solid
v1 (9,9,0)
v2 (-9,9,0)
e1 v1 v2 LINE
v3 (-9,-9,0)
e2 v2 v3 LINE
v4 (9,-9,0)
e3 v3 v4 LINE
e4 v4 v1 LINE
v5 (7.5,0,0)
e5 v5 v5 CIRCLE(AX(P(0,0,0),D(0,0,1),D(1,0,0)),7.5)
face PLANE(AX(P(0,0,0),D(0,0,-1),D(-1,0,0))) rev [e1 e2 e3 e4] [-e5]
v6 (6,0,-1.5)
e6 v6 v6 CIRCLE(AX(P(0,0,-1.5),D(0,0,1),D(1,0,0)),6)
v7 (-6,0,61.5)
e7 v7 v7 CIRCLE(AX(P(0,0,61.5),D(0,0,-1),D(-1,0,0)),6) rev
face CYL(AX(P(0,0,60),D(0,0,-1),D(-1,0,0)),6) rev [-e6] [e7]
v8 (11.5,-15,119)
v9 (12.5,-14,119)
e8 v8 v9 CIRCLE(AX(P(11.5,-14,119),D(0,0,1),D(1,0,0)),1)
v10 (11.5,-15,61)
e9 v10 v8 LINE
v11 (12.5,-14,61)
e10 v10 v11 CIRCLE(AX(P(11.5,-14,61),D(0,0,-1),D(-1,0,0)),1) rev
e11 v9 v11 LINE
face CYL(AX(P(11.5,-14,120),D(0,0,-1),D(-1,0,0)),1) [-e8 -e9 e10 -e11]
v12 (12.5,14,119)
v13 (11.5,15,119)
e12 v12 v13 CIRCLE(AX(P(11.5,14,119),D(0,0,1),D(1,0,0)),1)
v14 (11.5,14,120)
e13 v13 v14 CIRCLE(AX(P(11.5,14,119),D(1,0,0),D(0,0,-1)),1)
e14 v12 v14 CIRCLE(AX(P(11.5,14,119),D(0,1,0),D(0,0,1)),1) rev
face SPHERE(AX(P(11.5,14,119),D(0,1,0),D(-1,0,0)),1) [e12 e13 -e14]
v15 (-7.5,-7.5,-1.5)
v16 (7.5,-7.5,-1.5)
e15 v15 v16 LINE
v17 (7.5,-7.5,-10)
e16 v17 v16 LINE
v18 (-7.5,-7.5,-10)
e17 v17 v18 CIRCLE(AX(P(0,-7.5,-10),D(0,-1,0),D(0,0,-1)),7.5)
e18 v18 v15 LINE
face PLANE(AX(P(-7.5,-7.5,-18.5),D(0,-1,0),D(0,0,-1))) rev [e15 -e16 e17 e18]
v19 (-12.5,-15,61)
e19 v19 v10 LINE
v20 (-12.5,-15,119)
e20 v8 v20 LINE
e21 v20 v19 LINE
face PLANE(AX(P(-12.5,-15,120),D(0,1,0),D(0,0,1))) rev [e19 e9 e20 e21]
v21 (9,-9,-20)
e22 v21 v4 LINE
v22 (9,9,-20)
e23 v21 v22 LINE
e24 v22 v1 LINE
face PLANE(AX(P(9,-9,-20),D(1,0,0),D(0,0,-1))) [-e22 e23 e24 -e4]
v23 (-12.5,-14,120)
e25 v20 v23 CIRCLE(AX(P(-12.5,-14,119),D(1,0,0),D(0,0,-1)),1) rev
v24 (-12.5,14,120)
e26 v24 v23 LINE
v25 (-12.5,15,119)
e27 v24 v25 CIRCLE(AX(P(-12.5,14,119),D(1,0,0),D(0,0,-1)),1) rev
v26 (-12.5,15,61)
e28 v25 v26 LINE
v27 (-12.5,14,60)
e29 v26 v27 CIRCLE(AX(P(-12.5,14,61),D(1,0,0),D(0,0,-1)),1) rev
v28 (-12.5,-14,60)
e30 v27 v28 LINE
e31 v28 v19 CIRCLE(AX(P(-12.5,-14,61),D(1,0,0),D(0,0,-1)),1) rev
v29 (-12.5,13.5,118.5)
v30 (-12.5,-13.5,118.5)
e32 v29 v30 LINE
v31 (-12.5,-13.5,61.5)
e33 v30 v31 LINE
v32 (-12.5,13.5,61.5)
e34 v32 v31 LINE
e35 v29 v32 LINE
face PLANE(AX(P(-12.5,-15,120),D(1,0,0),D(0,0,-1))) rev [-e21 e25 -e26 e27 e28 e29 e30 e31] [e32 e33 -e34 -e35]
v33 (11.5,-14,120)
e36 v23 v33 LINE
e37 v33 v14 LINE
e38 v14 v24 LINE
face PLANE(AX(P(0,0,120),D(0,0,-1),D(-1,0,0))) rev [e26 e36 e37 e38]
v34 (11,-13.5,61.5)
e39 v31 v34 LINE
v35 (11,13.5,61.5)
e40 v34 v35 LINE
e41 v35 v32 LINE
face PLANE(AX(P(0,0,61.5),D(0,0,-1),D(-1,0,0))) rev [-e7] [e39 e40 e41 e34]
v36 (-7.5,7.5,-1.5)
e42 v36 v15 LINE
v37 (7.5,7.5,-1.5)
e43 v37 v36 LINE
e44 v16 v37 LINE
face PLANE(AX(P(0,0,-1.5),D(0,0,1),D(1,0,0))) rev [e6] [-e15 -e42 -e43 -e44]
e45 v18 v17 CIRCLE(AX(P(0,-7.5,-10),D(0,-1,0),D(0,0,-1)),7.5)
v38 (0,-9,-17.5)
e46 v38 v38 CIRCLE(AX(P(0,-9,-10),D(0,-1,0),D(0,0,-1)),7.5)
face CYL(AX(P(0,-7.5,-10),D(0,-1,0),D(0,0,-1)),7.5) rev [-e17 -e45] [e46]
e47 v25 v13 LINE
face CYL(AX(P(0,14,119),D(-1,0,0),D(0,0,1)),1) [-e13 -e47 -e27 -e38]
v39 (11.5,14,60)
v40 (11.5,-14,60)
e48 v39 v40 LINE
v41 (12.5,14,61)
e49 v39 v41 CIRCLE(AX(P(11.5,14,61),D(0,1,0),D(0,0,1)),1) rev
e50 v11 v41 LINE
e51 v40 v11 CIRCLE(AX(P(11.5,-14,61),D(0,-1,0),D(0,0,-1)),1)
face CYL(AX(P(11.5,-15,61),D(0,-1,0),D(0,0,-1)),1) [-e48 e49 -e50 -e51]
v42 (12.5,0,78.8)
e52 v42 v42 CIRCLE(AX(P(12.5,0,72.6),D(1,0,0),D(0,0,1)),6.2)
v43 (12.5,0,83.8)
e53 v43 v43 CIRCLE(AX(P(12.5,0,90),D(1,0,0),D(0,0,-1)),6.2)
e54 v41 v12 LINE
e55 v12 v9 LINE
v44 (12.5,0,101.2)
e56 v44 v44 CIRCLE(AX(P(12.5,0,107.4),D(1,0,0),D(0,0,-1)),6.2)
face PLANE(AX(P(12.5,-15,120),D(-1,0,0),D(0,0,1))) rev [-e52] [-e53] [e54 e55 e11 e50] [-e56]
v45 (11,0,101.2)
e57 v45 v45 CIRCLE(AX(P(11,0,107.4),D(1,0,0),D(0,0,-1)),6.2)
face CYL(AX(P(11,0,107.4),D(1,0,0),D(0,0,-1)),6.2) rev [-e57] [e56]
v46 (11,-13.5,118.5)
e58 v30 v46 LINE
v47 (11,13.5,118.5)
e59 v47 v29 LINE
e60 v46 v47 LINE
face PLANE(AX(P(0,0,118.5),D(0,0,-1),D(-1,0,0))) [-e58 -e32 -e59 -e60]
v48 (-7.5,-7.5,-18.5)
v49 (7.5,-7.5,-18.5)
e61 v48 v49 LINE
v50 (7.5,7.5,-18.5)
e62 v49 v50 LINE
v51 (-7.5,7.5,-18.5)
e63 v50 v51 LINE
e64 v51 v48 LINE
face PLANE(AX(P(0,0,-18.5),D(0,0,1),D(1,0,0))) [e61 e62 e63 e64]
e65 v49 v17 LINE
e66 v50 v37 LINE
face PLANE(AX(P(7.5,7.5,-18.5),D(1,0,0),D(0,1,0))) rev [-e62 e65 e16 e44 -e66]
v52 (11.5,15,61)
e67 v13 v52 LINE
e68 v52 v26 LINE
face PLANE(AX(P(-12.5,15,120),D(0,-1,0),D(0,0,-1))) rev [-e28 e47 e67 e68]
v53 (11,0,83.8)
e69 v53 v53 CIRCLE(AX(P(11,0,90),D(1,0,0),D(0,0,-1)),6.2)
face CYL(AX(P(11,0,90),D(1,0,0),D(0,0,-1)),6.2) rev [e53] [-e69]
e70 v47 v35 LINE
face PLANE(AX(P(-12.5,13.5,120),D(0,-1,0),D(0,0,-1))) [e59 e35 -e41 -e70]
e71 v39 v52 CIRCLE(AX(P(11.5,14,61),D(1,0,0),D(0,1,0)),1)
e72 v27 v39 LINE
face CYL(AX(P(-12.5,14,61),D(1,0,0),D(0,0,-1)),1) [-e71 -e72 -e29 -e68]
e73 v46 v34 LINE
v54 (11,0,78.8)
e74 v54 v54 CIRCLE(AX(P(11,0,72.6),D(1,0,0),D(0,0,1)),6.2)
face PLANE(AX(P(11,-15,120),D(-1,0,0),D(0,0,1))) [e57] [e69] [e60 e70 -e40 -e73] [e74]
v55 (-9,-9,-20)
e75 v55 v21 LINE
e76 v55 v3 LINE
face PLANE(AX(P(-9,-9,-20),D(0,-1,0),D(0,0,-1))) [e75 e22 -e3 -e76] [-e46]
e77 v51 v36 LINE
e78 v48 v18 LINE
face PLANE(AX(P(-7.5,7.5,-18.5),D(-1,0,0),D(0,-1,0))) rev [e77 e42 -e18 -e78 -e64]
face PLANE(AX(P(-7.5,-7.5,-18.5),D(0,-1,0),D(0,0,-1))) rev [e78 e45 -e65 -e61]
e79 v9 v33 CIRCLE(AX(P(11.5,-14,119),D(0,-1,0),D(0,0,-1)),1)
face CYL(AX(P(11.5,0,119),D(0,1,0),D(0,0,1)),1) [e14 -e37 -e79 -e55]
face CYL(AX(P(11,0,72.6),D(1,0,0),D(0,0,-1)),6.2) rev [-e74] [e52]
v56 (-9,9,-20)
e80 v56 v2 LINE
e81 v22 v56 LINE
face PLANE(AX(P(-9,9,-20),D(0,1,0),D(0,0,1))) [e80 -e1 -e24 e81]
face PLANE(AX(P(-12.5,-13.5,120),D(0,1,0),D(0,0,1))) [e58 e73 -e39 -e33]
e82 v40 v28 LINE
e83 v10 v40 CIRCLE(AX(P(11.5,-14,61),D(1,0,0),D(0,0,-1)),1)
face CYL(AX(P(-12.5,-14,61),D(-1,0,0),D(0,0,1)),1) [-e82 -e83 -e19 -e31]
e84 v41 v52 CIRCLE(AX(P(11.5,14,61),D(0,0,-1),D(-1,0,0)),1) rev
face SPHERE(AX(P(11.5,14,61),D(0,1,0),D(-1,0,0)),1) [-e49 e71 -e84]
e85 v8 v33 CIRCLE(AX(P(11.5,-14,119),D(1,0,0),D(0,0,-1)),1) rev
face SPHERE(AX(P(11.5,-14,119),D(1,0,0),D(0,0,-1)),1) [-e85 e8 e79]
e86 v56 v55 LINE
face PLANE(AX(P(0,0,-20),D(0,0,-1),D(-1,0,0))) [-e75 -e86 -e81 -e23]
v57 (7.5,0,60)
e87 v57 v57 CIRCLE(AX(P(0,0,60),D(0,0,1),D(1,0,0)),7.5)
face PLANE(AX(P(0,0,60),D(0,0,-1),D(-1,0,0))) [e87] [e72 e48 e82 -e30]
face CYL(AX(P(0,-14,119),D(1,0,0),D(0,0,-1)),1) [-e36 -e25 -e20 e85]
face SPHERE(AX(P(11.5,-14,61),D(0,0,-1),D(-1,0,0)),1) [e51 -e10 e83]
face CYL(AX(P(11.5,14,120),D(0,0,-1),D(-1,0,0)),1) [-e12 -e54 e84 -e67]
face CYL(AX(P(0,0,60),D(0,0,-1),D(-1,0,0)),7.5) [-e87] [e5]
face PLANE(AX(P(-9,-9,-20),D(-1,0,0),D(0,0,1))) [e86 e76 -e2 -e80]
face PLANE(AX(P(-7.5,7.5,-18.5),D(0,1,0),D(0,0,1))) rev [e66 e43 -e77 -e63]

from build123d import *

# Parameters (mm, degrees)
SKETCH_1_R          = 7.5
EXTRUDE_1_DEPTH     = 60
SHELL_3_T           = -1.5
SKETCH_4_W          = 25
SKETCH_4_H          = 30
EXTRUDE_4_DEPTH     = 60
SHELL_START         = 61.5
SHELL_4_OUTLINE_W   = 23.5
SHELL_4_OUTLINE_H   = 27
SHELL_4_DEPTH       = 57
SHELL_START_2       = 60
SHELL_4_2_OUTLINE_R = 6
SHELL_4_2_DEPTH     = 1.5
SKETCH_5_R          = 6.2
CUT_EXTRUDE_1_DEPTH = 1.5
SKETCH_18_W         = 18
SKETCH_18_H         = 18
EXTRUDE_10_DEPTH    = 20
SKETCH_19_W         = 15
SKETCH_19_H         = 15
CUT_EXTRUDE_5_DEPTH = 17
SKETCH_20_R         = 6
CUT_EXTRUDE_6_DEPTH = 1.5
SKETCH_22_R         = 7.5
CUT_EXTRUDE_7_DEPTH = 1.5
FILLET_5_R          = 1


# Read off the part's stored shape, not the designer's step: 抽壳4
with BuildPart() as part:
    # 草图1 → 凸台-拉伸1 (new body)
    with BuildSketch(Plane.XY):
        Circle(SKETCH_1_R)
    extrude(amount=EXTRUDE_1_DEPTH)

    # 抽壳3
    shell_3_openings = [part.faces().sort_by_distance(p)[0] for p in [
        (0, 0, 60),
        (0, 0, 0),
    ]]
    offset(amount=SHELL_3_T, openings=shell_3_openings, kind=Kind.INTERSECTION)

    # 草图4 → 凸台-拉伸4 (add)
    with BuildSketch(Plane.XY.offset(60)):
        Rectangle(SKETCH_4_W, SKETCH_4_H)
    extrude(amount=EXTRUDE_4_DEPTH)

    # 抽壳4 outline → 抽壳4 (cut)
    with BuildSketch(Plane.XY.offset(SHELL_START)):
        with Locations((-0.75, 0)):
            Rectangle(SHELL_4_OUTLINE_W, SHELL_4_OUTLINE_H)
    extrude(amount=SHELL_4_DEPTH, mode=Mode.SUBTRACT)

    # Shell 4 2 outline → Shell 4 2 (cut)
    with BuildSketch(Plane.XY.offset(SHELL_START_2)):
        Circle(SHELL_4_2_OUTLINE_R)
    extrude(amount=SHELL_4_2_DEPTH, mode=Mode.SUBTRACT)

    # 草图5 → 切除-拉伸1 (cut)
    with BuildSketch(Plane(origin=(12.5, 0, 0), x_dir=(0, 0, -1), z_dir=(1, 0, 0))):
        with Locations((-90, 0)):
            Circle(SKETCH_5_R)
        with Locations((-107.4, 0)):
            Circle(SKETCH_5_R)
        with Locations(Location((-72.6, 0, 0), (0, 0, 180))):
            Circle(SKETCH_5_R)
    extrude(amount=-CUT_EXTRUDE_1_DEPTH, mode=Mode.SUBTRACT)

    # 草图18 → 凸台-拉伸10 (add)
    with BuildSketch(Plane.XY):
        Rectangle(SKETCH_18_W, SKETCH_18_H)
    extrude(amount=-EXTRUDE_10_DEPTH)

    # 草图19 → 切除-拉伸5 (cut)
    with BuildSketch(Plane.XY.offset(-1.5)):
        Rectangle(SKETCH_19_W, SKETCH_19_H)
    extrude(amount=-CUT_EXTRUDE_5_DEPTH, mode=Mode.SUBTRACT)

    # 草图20 → 切除-拉伸6 (cut)
    with BuildSketch(Plane.XY.offset(-1.5)):
        with Locations(Location((0, 0, 0), (0, 0, 180))):
            Circle(SKETCH_20_R)
    extrude(amount=CUT_EXTRUDE_6_DEPTH, mode=Mode.SUBTRACT)

    # 草图22 → 切除-拉伸7 (cut)
    with BuildSketch(Plane(origin=(0, -9, 0), x_dir=(-1, 0, 0), z_dir=(0, -1, 0))):
        with Locations(Location((0, 10, 0), (0, 0, 90))):
            Circle(SKETCH_22_R)
    extrude(amount=-CUT_EXTRUDE_7_DEPTH, mode=Mode.SUBTRACT)

    # 圆角5
    fillet_5_edges = [part.edges().sort_by_distance(p)[0] for p in [
        (12.5, 0, 60),
        (12.5, -15, 90),
        (0, 15, 60),
        (12.5, 15, 90),
        (0, -15, 60),
        (12.5, 0, 120),
        (0, 15, 120),
        (0, -15, 120),
    ]]
    fillet(fillet_5_edges, radius=FILLET_5_R)


solid = part.part
